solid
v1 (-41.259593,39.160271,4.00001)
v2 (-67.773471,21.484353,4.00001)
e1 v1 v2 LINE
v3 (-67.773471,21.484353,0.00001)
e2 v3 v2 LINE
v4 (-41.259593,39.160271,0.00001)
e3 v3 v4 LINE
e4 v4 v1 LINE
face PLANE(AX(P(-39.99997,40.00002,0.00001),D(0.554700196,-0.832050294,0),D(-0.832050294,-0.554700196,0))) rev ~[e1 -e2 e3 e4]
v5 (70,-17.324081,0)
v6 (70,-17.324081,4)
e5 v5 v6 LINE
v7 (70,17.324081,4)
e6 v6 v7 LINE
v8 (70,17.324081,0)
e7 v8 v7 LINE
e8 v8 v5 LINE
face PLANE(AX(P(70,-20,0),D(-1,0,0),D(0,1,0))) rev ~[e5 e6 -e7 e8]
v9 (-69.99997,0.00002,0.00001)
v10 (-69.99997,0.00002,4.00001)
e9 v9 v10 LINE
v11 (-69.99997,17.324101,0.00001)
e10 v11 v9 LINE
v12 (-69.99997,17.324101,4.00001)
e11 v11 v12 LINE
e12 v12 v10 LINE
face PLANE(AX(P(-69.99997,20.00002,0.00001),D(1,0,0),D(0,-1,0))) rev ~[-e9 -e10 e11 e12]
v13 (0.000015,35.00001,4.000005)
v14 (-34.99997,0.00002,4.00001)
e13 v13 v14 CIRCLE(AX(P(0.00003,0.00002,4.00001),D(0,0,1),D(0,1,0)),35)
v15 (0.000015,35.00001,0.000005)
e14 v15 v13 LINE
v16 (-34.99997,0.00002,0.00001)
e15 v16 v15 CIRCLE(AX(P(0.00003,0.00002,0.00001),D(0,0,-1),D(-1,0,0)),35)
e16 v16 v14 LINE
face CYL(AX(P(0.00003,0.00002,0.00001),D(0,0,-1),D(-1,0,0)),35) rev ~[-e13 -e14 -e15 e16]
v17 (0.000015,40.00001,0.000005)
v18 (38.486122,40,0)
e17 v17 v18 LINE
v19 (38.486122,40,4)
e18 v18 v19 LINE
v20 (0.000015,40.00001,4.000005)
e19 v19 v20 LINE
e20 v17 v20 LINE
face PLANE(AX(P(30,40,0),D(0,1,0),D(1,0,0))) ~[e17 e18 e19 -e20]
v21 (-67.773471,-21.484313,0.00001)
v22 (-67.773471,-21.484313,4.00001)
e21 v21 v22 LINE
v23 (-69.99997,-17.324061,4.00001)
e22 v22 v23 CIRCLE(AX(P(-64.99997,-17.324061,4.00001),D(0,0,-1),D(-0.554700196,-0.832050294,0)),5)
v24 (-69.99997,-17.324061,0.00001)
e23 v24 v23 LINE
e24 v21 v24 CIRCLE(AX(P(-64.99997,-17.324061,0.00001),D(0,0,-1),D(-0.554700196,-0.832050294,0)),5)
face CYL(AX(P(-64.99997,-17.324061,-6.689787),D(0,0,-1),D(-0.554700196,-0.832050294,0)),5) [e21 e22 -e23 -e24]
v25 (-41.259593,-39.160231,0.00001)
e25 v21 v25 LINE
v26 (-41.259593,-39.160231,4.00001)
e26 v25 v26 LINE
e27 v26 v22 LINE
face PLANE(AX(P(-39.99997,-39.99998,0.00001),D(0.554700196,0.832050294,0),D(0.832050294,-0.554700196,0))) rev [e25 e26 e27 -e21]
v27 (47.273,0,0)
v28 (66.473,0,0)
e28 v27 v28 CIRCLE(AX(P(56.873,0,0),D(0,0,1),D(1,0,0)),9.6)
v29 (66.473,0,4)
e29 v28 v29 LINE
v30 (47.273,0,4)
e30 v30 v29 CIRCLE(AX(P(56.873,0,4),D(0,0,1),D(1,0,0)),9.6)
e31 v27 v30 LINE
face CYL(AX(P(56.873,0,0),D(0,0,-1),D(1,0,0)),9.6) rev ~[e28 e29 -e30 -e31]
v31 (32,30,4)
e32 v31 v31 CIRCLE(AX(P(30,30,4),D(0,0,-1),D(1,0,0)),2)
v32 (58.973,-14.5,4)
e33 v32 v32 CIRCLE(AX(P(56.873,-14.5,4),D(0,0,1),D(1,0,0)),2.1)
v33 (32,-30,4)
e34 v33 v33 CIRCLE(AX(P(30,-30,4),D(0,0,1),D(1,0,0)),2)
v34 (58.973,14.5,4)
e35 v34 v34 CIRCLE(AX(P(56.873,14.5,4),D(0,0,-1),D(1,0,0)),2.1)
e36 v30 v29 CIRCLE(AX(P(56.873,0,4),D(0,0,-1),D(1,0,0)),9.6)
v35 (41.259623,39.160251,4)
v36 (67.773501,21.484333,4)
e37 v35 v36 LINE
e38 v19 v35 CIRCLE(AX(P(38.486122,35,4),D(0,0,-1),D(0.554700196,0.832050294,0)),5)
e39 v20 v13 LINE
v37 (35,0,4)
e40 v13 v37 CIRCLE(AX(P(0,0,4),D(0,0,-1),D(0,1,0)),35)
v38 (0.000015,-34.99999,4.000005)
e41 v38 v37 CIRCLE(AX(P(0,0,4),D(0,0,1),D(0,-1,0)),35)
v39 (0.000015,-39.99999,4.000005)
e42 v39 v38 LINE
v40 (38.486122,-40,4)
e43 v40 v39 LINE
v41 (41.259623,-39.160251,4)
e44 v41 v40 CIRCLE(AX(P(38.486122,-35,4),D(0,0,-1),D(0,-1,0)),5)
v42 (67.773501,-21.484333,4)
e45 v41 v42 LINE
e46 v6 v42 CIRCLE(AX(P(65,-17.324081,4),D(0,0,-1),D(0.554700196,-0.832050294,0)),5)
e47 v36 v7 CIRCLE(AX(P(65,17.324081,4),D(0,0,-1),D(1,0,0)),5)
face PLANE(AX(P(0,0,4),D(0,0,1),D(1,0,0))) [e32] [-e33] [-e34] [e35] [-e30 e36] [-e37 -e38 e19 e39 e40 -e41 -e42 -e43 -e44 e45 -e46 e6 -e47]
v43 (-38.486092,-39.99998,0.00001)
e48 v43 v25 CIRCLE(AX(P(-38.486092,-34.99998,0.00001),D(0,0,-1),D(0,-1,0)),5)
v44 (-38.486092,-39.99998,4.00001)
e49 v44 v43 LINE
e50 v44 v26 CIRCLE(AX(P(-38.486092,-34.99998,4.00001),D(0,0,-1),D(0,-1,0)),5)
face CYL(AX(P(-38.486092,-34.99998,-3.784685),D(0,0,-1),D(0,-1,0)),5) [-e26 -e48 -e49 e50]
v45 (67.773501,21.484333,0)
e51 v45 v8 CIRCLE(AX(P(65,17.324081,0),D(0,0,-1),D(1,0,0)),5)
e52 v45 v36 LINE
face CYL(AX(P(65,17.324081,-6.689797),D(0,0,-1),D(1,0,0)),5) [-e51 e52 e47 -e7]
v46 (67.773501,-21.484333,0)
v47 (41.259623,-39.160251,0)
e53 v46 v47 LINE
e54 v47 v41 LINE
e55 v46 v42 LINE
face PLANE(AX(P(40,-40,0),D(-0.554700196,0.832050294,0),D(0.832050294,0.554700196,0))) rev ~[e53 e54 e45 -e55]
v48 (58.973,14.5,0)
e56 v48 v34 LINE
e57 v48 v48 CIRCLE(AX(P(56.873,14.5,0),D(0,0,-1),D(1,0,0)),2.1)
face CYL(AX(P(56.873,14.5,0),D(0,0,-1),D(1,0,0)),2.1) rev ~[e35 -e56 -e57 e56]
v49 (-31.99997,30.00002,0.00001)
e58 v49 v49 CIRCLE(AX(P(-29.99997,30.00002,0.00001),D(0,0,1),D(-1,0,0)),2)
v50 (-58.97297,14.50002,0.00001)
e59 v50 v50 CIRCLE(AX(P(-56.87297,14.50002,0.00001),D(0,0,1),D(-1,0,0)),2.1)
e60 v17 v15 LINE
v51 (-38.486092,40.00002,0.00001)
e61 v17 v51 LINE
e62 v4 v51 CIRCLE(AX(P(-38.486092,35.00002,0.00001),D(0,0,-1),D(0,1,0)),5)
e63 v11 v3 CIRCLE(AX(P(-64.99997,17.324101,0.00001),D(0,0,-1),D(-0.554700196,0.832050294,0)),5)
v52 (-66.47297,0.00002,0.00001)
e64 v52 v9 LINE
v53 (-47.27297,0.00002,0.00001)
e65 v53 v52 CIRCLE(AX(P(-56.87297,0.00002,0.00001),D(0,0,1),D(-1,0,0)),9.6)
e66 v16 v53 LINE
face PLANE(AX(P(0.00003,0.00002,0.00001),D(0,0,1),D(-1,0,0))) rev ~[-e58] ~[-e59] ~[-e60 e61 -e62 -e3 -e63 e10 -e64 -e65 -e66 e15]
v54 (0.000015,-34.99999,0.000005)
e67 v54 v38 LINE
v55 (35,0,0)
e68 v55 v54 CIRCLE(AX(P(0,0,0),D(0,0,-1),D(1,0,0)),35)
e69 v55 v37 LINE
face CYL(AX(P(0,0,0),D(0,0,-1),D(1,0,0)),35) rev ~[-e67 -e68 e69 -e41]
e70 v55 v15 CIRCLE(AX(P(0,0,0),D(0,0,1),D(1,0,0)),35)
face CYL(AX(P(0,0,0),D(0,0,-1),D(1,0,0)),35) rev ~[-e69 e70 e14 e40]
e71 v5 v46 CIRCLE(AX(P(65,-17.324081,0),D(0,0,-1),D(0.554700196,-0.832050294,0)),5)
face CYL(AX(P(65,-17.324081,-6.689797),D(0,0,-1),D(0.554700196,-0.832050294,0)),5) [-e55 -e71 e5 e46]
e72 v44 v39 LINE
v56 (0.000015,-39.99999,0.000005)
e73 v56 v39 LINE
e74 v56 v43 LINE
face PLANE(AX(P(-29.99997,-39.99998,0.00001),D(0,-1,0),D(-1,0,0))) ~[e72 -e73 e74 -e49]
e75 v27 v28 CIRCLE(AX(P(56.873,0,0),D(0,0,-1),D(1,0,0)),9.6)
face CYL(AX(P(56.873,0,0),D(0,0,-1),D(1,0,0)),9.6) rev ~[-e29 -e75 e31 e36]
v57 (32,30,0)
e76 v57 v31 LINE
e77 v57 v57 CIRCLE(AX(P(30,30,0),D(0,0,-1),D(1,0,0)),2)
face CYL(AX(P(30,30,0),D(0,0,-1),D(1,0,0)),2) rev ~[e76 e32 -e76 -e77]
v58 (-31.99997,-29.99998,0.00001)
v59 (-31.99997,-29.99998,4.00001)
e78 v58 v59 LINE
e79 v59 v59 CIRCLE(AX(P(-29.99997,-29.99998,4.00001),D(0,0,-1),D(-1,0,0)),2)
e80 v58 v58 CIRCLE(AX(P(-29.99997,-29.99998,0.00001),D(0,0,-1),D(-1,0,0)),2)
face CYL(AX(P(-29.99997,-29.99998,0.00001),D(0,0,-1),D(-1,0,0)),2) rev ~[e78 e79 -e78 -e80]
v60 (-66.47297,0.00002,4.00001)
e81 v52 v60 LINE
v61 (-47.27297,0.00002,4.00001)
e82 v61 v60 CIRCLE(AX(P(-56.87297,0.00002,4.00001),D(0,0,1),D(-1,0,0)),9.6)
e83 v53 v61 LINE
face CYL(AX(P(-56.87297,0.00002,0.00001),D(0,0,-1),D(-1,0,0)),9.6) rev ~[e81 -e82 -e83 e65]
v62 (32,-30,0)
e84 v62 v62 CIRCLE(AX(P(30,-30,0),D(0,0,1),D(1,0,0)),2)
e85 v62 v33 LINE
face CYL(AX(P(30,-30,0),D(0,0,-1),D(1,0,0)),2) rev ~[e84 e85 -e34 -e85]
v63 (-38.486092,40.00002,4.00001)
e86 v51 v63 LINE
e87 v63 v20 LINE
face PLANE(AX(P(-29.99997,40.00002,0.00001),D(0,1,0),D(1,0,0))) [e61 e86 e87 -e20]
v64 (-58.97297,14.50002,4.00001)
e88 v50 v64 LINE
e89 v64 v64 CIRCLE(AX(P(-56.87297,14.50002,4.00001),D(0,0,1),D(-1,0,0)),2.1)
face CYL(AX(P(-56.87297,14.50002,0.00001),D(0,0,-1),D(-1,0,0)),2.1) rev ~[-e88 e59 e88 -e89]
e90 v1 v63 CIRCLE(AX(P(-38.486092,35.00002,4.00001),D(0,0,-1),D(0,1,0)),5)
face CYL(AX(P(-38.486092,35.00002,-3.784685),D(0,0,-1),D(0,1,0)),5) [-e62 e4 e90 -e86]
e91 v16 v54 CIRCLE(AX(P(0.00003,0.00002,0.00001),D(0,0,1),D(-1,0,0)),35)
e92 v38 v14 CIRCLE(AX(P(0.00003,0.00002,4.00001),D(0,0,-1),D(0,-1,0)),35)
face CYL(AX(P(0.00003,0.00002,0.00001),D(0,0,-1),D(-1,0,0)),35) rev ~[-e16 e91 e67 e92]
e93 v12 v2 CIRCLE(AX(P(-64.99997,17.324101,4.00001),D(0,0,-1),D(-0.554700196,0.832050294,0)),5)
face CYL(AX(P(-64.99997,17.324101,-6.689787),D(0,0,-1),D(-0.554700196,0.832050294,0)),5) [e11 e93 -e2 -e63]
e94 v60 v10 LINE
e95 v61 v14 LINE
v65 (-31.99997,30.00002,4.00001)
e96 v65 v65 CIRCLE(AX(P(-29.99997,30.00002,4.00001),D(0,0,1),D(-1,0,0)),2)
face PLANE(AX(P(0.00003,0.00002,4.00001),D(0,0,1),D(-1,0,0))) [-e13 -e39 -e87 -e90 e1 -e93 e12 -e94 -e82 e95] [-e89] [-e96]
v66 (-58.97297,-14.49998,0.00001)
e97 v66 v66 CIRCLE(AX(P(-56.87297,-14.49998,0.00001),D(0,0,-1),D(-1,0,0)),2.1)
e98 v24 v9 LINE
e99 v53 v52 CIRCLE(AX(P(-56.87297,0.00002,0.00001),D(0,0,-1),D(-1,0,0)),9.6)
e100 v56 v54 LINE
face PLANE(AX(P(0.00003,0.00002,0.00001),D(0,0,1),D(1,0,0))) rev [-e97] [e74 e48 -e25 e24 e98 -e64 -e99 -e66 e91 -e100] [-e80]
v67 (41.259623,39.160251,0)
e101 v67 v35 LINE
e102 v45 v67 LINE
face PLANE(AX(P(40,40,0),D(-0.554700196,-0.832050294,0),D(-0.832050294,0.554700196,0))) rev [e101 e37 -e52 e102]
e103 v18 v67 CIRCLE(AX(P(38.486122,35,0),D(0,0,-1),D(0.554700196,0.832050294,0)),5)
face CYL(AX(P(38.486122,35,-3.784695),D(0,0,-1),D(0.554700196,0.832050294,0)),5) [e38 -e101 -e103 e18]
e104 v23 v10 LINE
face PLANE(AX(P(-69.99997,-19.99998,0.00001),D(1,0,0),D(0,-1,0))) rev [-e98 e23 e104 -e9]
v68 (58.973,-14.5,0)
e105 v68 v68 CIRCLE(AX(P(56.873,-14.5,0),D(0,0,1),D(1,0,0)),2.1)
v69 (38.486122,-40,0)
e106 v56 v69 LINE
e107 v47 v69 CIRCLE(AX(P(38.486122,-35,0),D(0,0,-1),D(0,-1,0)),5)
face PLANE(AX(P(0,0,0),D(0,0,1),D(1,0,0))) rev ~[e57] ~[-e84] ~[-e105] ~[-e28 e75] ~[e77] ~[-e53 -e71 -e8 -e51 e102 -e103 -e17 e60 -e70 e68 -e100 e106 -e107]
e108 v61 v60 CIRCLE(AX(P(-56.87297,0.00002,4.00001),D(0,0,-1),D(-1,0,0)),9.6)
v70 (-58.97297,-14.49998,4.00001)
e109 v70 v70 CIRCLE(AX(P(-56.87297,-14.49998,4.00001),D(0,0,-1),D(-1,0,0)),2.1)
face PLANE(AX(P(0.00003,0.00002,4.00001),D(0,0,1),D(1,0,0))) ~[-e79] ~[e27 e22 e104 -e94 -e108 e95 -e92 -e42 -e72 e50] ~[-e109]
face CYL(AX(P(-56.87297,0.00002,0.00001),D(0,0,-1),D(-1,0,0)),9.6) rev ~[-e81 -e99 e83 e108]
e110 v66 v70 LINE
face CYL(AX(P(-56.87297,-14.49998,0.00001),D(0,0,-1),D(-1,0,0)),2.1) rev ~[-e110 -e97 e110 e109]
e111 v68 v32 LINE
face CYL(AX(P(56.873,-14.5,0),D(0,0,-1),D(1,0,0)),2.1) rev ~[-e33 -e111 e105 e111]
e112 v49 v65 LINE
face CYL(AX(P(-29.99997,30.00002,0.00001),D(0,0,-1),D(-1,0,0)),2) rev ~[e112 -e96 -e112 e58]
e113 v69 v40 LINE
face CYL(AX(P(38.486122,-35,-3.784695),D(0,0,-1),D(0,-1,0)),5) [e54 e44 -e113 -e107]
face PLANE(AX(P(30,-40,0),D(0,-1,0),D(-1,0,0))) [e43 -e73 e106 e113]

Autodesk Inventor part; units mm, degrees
ref_plane "YZ Plane" through (0, 0, 0) normal (1, 0, 0) x (0, 1, 0)
ref_plane "XZ Plane" through (0, 0, 0) normal (0, 1, 0) x (-1, 0, 0)
ref_plane "Plano de trabalho1" through (0, 0, 0) normal (0, 0, 1) x (1, 0, 0)
sketch "Esboço1" plane through (0, 0, 0) normal (0, 0, 1) x (1, 0, 0)
  arc A0 (-40, -30) -> (-30, -40) centre (-30, -30) ccw projected
  line L0 (30, -40) -> (-30, -40) projected
  line L1 (40, 30) -> (40, -30) projected
  arc A1 (40, 30) -> (30, 40) centre (30, 30) ccw projected
  line L2 (-30, 40) -> (30, 40) projected
  arc A2 (-30, 40) -> (-40, 30) centre (-30, 30) ccw projected
  line L3 (-40, -30) -> (-40, 30) projected
  circle A3 centre (0, 0) radius 5 projected
  circle A4 centre (0, 0) radius 35
  circle A5 centre (30, 30) radius 2
  circle A6 centre (30, -30) radius 2
  circle A7 centre (-30, -30) radius 2
  circle A8 centre (-30, 30) radius 2
  line L4 (0, 0) -> (88.4205, 0)
  circle A9 centre (56.873, 0) radius 9.6
  circle A10 centre (56.873, 0) radius 24.3683
  line L5 (70, -20) -> (70, 13.4311)
  line L6 (0, -54.5393) -> (0, 0)
  line L7 (0, 0) -> (97.6155, 0)
  line L8 (40, -30) -> (40, -40)
  line L9 (40, -40) -> (30, -40)
  line L10 (40, -40) -> (70, -20)
  circle A11 centre (56.873, -14.5) radius 2.1
  point P0 (0, 0)
  point P1 (70, 0)
  point P2 (66.473, 0)
  point P3 (47.273, 0)
  point P4 (5, 0)
  point P5 (0, -5)
  point P6 (0, -40)
  point P7 (35, 0)
  point P8 (0, -35)
  dimension "d0" = 70
  dimension "d3" = 4
  dimension "d4" = 4
  dimension "d5" = 4
  dimension "d6" = 4
  dimension "d7" = 19.2
  dimension "d8" = 30
  dimension "d9" = 20
  dimension "d12" = 4.2
  dimension "d13" = 14.5
  dimension "d14" = 16.873
  dimension "d15" = 16.873
extrude "Extrusão2" add sketch "Esboço1" along normal blind 4 contours L6 A4 A10 L1 L8 L9 L0 | L8 L1 A10 L10 | A4 L4 L1 A10 | A10 L1 L4 A9 L5 L10 picked at (39.1782, -10.8029)
mirror "Espelhamento1" about plane through (70, 0, 0) normal (0, 1, 0) of "Extrusão2"
mirror "Espelhamento2" about plane through (0, 35, 0) normal (-1, 0, 0) of "Extrusão2", "Espelhamento1"
fillet "Arredondamento1" radius 5 8 edges at (40, -40, 2) (70, -20, 2) (70, 20, 2) (40, 40, 2) (-40, 40, 2) (-70, 20, 2) (-70, -20, 2) (-40, -40, 2)
equation "\"d3\" = d6"
equation "\"d4\" = d6"
equation "\"d5\" = d6"
equation "\"d15\" = d14"
properties part number "suporte-superior"
